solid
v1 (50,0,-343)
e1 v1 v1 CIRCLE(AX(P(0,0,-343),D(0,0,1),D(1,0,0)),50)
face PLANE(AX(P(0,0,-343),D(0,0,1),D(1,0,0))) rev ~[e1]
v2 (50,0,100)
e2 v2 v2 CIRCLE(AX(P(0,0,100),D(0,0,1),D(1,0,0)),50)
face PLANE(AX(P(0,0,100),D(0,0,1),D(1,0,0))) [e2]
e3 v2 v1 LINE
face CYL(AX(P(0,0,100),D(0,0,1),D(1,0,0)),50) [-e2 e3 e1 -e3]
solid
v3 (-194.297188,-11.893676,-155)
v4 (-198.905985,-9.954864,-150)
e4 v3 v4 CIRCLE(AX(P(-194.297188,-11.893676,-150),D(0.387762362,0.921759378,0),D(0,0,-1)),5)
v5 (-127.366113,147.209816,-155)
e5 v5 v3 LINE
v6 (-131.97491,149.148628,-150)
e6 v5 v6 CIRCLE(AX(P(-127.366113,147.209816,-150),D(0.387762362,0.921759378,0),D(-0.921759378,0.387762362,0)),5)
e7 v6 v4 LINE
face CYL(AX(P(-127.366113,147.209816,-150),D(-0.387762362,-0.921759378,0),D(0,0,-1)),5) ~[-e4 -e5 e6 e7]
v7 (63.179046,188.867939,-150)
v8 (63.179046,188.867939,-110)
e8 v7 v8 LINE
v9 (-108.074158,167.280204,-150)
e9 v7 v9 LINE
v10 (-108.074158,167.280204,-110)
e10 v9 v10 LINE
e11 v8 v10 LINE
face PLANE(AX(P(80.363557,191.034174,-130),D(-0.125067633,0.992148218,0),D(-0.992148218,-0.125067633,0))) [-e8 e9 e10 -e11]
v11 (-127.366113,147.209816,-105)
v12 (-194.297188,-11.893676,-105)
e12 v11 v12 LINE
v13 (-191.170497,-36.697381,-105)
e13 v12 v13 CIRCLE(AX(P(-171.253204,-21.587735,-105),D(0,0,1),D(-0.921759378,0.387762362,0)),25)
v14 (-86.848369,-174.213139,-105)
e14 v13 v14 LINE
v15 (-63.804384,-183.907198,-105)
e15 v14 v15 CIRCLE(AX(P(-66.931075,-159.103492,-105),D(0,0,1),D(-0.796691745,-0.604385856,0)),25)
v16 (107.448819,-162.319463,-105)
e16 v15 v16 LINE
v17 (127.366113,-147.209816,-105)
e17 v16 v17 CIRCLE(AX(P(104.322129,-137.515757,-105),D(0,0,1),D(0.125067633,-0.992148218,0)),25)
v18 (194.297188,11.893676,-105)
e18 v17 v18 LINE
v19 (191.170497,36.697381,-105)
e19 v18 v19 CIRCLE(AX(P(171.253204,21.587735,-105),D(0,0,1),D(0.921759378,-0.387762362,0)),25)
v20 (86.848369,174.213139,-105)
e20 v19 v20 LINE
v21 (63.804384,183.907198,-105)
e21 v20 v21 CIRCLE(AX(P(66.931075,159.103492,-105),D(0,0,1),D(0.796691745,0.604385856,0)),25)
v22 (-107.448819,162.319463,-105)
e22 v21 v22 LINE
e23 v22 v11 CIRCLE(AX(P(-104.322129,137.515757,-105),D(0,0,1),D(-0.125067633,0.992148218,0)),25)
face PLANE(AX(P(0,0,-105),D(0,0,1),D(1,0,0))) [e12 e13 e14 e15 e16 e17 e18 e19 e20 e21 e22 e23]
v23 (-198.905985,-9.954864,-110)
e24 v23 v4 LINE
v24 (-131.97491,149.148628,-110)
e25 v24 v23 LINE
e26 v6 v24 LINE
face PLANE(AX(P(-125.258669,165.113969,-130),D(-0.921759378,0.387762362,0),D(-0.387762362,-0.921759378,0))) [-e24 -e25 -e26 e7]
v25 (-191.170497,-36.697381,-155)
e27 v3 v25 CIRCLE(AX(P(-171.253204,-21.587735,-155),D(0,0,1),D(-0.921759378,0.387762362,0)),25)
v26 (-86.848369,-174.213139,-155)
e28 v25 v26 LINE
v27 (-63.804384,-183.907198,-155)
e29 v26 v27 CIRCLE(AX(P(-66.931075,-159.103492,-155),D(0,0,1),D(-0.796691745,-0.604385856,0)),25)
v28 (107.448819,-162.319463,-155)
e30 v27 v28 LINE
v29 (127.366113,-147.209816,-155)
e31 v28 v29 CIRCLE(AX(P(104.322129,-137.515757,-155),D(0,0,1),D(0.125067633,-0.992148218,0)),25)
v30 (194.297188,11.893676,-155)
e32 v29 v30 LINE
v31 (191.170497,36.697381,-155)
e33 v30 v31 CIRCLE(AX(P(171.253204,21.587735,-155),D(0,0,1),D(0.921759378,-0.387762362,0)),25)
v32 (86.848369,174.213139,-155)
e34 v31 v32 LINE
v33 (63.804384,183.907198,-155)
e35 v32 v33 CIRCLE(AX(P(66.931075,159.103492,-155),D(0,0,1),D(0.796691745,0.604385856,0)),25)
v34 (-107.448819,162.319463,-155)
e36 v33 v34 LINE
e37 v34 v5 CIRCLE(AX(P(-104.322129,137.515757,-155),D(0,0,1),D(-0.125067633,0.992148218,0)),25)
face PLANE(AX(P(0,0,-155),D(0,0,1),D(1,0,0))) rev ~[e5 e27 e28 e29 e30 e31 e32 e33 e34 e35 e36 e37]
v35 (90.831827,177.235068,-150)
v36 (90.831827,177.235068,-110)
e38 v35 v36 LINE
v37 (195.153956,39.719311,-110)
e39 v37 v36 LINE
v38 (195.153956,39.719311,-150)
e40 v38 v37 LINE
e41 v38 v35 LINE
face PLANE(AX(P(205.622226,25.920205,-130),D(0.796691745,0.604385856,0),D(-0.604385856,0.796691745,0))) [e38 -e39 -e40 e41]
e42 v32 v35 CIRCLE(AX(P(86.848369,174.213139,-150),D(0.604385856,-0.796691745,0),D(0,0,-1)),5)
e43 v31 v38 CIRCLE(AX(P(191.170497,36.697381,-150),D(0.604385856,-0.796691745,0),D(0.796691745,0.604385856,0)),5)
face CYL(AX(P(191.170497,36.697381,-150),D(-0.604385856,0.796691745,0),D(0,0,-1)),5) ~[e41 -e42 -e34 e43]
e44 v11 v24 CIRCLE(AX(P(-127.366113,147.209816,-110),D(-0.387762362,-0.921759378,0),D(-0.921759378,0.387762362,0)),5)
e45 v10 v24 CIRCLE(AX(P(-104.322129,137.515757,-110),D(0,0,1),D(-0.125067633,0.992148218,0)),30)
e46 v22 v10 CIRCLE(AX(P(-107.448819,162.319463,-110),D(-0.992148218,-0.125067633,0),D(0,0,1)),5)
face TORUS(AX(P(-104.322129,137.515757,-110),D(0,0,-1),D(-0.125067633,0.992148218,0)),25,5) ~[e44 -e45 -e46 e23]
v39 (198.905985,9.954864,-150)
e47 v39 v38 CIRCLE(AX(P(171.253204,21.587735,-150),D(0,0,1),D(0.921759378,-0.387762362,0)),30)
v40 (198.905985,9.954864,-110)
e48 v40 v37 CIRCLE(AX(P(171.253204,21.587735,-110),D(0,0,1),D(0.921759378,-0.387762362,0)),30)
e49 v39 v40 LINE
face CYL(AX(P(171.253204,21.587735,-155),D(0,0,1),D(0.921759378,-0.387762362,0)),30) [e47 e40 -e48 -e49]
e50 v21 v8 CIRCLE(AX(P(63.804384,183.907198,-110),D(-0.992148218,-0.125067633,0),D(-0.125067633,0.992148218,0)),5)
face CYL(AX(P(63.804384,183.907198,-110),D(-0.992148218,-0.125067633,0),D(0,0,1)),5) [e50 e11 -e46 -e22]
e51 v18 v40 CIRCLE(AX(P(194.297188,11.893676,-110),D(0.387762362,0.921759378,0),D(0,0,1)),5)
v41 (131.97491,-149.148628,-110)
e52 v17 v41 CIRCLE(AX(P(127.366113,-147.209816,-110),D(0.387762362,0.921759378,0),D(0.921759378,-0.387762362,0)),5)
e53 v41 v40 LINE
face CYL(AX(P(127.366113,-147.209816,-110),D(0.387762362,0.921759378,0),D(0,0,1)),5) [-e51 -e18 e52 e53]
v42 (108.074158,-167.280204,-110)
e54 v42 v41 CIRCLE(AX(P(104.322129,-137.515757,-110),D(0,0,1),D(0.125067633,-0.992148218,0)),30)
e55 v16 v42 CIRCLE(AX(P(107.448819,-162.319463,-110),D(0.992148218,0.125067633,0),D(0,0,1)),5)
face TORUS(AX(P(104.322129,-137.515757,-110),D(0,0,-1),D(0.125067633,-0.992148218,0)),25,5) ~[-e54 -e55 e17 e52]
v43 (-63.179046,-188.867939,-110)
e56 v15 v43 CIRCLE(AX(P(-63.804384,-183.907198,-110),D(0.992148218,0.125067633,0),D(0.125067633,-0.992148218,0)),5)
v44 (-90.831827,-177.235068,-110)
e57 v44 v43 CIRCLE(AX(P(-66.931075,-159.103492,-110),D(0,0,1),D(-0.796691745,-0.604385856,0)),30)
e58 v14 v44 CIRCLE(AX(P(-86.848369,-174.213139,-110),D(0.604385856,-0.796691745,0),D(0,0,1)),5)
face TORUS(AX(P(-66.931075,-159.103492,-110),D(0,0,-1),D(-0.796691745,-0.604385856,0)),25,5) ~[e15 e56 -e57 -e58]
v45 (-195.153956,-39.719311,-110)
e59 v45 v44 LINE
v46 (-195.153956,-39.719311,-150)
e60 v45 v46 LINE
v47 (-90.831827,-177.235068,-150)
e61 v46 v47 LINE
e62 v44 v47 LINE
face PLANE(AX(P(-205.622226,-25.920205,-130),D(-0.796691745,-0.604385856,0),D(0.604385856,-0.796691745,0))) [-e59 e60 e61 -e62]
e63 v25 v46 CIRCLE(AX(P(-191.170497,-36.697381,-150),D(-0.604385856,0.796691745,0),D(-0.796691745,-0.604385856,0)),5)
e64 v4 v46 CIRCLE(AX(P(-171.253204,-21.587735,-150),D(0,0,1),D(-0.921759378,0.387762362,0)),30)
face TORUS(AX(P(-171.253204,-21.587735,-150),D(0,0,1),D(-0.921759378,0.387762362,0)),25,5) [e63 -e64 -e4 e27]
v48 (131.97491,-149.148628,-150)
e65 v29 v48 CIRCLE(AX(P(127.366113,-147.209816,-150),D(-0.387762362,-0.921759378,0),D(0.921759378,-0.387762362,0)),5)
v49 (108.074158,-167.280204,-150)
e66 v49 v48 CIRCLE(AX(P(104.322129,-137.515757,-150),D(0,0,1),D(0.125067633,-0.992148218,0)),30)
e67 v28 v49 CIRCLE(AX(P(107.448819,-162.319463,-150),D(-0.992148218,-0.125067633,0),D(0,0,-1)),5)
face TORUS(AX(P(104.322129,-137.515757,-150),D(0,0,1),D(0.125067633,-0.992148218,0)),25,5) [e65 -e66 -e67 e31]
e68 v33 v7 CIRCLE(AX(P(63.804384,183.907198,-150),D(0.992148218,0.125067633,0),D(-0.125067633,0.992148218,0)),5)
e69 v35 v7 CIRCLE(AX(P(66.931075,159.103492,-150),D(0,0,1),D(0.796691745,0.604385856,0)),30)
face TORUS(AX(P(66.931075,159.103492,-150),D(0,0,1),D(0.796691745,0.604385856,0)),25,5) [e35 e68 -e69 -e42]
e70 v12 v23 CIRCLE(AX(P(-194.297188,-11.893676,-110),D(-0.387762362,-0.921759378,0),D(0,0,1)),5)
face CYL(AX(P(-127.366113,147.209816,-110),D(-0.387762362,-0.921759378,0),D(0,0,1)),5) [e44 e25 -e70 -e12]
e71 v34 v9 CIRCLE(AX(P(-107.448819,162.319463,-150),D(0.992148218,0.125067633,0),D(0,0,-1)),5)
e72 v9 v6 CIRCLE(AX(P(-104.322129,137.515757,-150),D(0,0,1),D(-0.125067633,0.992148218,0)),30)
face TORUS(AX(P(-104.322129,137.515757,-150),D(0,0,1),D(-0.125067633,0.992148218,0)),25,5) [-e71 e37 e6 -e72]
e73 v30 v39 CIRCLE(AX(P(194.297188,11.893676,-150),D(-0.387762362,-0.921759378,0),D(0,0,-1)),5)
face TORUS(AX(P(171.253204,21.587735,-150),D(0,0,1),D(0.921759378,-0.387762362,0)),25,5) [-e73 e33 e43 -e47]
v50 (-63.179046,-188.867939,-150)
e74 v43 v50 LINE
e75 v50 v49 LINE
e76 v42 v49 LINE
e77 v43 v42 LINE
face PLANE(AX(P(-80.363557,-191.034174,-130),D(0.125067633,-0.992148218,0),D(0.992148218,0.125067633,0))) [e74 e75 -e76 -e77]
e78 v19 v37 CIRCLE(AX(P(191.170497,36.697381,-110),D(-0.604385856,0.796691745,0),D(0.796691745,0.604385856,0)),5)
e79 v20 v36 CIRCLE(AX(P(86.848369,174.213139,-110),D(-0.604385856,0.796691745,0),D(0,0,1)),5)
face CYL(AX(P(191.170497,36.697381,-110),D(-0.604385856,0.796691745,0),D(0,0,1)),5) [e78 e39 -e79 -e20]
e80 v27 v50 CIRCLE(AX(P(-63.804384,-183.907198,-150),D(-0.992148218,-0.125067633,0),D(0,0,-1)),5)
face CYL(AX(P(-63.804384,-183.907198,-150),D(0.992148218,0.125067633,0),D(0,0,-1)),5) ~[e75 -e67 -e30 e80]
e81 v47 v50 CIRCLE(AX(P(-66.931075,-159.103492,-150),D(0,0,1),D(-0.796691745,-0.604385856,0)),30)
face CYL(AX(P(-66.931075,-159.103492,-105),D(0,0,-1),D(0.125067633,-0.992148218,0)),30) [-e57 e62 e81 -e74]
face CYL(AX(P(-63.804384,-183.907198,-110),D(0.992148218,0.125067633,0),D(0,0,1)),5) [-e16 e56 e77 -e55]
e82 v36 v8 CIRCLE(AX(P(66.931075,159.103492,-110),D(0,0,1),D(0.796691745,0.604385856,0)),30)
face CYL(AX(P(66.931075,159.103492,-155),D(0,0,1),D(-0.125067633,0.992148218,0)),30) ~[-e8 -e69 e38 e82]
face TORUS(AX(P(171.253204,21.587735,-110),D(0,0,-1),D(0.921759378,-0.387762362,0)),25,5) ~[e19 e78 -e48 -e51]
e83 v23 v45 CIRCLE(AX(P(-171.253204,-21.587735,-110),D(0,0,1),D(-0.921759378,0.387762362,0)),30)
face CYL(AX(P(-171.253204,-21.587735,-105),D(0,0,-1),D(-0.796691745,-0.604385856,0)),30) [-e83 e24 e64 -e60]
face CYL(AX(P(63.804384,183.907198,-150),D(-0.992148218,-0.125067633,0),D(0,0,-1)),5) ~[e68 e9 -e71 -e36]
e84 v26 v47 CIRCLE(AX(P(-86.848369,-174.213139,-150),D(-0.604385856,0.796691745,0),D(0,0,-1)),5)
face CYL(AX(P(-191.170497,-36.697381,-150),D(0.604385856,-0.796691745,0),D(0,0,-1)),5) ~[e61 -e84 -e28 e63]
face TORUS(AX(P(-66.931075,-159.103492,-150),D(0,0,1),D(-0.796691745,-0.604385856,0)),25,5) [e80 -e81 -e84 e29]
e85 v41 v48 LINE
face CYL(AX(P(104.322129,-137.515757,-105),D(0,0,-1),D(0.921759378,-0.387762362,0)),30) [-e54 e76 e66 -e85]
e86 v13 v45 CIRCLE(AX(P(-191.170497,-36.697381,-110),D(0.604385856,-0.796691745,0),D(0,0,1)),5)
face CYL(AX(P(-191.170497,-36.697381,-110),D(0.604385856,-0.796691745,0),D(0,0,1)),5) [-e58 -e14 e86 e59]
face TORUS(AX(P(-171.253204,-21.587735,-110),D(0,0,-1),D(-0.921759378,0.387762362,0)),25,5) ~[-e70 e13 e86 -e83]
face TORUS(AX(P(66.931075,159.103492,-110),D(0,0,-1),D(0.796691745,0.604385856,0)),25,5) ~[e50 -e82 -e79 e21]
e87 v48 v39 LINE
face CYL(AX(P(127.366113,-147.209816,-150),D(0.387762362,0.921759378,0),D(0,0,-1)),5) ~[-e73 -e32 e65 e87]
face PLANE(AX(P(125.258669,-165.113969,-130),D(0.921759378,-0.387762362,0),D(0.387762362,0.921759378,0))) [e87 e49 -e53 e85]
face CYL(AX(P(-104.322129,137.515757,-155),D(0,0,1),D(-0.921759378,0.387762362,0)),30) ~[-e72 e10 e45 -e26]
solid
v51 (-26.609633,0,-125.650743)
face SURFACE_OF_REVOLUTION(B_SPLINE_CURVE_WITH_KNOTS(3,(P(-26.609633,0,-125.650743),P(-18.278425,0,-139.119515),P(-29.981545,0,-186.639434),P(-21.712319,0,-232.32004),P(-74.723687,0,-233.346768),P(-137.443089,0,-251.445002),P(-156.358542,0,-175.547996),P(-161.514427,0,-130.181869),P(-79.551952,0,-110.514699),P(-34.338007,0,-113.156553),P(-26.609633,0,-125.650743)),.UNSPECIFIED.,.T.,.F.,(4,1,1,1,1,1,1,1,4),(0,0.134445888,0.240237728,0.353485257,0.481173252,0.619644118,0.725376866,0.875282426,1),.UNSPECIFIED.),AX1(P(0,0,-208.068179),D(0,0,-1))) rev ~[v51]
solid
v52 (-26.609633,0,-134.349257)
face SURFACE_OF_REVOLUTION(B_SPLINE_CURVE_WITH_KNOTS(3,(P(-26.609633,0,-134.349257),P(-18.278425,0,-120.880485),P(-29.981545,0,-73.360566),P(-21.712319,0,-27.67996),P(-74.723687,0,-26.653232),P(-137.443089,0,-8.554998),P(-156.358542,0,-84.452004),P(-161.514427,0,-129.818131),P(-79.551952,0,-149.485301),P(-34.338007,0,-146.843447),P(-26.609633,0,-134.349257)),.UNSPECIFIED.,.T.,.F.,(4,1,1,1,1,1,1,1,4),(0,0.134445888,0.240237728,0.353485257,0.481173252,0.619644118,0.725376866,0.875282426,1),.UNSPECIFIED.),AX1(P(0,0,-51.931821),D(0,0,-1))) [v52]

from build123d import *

# Parameters (mm, degrees)
F8_DEPTH  = 25
F9_R      = 30
F10_R     = 5
F12_R     = 50
F13_DEPTH = 443


# Not quite as in the source:
# - a feature names something its author has since deleted; it is built from what else it names
# - the program builds the solid bodies; features that only make, move or delete a surface that nothing else refers to are left out


with BuildPart() as f4:
    # F3 (on Front) → F4 (revolve)
    with BuildSketch(Plane.XZ):
        with BuildLine():
            add(Edge.make_bspline(
                [(-26.6096331179, -134.3492567539), (-18.2784247962, -120.8804854669), (-29.9815447108, -73.3605660468), (-21.7123194688, -27.679959609), (-74.7236870412, -26.6532322909), (-137.4430886255, -8.554998099), (-156.3585418602, -84.452004453), (-161.5144273247, -129.8181314401), (-79.5519521234, -149.485301482), (-34.3380070388, -146.8434468812), (-26.6096331179, -134.3492567539)],
                knots=[0, 0, 0, 0, 0.1344458877, 0.2402377282, 0.3534852575, 0.4811732516, 0.6196441183, 0.7253768662, 0.8752824258, 1, 1, 1, 1], degree=3))
        make_face()
    revolve(axis=Axis((0, 0, -51.9318208098), (0, 0, -1)))


with BuildPart() as f6_1:
    # F6: instance of F4
    add(f4.part.mirror(Plane.XY.offset(-130)))


with BuildPart() as f8:
    # F7 (on offset) → F8 (new body, symmetric)
    with BuildSketch(Plane.XY.offset(-130)):
        Polygon((125.2586688438, -165.1139688894), (205.6222259998, 25.9202048182), (80.363557156, 191.0341737077), (-125.2586688438, 165.1139688894), (-205.6222259998, -25.9202048182), (-80.363557156, -191.0341737077), align=None)
    extrude(amount=F8_DEPTH, both=True)

    # F9
    f9_edges = [f8.edges().sort_by_distance(p)[0] for p in [
        (125.258669, -165.113969, -130),
        (-80.363557, -191.034174, -130),
        (-205.622226, -25.920205, -130),
        (-125.258669, 165.113969, -130),
        (80.363557, 191.034174, -130),
        (205.622226, 25.920205, -130),
    ]]
    fillet(f9_edges, radius=F9_R)

    # F10
    f10_edges = [f8.edges().sort_by_distance(p)[0] for p in [
        (22.447556, -178.074071, -155),
        (-78.563946, -186.756274, -155),
        (-142.992892, -108.477189, -155),
        (-201.01765, -25.339764, -155),
        (-165.440447, 69.596882, -155),
        (-122.453704, 161.41651, -155),
        (122.453704, -161.41651, -155),
        (-22.447556, 178.074071, -155),
        (165.440447, -69.596882, -155),
        (78.563946, 186.756274, -155),
        (201.01765, 25.339764, -155),
        (142.992892, 108.477189, -155),
        (-142.992892, -108.477189, -105),
        (-201.01765, -25.339764, -105),
        (-78.563946, -186.756274, -105),
        (-165.440447, 69.596882, -105),
        (22.447556, -178.074071, -105),
        (-122.453704, 161.41651, -105),
        (122.453704, -161.41651, -105),
        (-22.447556, 178.074071, -105),
        (165.440447, -69.596882, -105),
        (78.563946, 186.756274, -105),
        (201.01765, 25.339764, -105),
        (142.992892, 108.477189, -105),
    ]]
    fillet(f10_edges, radius=F10_R)


with BuildPart() as f13:
    # F12 (on offset) → F13 (new body)
    with BuildSketch(Plane.XY.offset(100)):
        Circle(F12_R)
    extrude(amount=-F13_DEPTH)


solid = Compound([f4.part, f6_1.part, f8.part, f13.part])
